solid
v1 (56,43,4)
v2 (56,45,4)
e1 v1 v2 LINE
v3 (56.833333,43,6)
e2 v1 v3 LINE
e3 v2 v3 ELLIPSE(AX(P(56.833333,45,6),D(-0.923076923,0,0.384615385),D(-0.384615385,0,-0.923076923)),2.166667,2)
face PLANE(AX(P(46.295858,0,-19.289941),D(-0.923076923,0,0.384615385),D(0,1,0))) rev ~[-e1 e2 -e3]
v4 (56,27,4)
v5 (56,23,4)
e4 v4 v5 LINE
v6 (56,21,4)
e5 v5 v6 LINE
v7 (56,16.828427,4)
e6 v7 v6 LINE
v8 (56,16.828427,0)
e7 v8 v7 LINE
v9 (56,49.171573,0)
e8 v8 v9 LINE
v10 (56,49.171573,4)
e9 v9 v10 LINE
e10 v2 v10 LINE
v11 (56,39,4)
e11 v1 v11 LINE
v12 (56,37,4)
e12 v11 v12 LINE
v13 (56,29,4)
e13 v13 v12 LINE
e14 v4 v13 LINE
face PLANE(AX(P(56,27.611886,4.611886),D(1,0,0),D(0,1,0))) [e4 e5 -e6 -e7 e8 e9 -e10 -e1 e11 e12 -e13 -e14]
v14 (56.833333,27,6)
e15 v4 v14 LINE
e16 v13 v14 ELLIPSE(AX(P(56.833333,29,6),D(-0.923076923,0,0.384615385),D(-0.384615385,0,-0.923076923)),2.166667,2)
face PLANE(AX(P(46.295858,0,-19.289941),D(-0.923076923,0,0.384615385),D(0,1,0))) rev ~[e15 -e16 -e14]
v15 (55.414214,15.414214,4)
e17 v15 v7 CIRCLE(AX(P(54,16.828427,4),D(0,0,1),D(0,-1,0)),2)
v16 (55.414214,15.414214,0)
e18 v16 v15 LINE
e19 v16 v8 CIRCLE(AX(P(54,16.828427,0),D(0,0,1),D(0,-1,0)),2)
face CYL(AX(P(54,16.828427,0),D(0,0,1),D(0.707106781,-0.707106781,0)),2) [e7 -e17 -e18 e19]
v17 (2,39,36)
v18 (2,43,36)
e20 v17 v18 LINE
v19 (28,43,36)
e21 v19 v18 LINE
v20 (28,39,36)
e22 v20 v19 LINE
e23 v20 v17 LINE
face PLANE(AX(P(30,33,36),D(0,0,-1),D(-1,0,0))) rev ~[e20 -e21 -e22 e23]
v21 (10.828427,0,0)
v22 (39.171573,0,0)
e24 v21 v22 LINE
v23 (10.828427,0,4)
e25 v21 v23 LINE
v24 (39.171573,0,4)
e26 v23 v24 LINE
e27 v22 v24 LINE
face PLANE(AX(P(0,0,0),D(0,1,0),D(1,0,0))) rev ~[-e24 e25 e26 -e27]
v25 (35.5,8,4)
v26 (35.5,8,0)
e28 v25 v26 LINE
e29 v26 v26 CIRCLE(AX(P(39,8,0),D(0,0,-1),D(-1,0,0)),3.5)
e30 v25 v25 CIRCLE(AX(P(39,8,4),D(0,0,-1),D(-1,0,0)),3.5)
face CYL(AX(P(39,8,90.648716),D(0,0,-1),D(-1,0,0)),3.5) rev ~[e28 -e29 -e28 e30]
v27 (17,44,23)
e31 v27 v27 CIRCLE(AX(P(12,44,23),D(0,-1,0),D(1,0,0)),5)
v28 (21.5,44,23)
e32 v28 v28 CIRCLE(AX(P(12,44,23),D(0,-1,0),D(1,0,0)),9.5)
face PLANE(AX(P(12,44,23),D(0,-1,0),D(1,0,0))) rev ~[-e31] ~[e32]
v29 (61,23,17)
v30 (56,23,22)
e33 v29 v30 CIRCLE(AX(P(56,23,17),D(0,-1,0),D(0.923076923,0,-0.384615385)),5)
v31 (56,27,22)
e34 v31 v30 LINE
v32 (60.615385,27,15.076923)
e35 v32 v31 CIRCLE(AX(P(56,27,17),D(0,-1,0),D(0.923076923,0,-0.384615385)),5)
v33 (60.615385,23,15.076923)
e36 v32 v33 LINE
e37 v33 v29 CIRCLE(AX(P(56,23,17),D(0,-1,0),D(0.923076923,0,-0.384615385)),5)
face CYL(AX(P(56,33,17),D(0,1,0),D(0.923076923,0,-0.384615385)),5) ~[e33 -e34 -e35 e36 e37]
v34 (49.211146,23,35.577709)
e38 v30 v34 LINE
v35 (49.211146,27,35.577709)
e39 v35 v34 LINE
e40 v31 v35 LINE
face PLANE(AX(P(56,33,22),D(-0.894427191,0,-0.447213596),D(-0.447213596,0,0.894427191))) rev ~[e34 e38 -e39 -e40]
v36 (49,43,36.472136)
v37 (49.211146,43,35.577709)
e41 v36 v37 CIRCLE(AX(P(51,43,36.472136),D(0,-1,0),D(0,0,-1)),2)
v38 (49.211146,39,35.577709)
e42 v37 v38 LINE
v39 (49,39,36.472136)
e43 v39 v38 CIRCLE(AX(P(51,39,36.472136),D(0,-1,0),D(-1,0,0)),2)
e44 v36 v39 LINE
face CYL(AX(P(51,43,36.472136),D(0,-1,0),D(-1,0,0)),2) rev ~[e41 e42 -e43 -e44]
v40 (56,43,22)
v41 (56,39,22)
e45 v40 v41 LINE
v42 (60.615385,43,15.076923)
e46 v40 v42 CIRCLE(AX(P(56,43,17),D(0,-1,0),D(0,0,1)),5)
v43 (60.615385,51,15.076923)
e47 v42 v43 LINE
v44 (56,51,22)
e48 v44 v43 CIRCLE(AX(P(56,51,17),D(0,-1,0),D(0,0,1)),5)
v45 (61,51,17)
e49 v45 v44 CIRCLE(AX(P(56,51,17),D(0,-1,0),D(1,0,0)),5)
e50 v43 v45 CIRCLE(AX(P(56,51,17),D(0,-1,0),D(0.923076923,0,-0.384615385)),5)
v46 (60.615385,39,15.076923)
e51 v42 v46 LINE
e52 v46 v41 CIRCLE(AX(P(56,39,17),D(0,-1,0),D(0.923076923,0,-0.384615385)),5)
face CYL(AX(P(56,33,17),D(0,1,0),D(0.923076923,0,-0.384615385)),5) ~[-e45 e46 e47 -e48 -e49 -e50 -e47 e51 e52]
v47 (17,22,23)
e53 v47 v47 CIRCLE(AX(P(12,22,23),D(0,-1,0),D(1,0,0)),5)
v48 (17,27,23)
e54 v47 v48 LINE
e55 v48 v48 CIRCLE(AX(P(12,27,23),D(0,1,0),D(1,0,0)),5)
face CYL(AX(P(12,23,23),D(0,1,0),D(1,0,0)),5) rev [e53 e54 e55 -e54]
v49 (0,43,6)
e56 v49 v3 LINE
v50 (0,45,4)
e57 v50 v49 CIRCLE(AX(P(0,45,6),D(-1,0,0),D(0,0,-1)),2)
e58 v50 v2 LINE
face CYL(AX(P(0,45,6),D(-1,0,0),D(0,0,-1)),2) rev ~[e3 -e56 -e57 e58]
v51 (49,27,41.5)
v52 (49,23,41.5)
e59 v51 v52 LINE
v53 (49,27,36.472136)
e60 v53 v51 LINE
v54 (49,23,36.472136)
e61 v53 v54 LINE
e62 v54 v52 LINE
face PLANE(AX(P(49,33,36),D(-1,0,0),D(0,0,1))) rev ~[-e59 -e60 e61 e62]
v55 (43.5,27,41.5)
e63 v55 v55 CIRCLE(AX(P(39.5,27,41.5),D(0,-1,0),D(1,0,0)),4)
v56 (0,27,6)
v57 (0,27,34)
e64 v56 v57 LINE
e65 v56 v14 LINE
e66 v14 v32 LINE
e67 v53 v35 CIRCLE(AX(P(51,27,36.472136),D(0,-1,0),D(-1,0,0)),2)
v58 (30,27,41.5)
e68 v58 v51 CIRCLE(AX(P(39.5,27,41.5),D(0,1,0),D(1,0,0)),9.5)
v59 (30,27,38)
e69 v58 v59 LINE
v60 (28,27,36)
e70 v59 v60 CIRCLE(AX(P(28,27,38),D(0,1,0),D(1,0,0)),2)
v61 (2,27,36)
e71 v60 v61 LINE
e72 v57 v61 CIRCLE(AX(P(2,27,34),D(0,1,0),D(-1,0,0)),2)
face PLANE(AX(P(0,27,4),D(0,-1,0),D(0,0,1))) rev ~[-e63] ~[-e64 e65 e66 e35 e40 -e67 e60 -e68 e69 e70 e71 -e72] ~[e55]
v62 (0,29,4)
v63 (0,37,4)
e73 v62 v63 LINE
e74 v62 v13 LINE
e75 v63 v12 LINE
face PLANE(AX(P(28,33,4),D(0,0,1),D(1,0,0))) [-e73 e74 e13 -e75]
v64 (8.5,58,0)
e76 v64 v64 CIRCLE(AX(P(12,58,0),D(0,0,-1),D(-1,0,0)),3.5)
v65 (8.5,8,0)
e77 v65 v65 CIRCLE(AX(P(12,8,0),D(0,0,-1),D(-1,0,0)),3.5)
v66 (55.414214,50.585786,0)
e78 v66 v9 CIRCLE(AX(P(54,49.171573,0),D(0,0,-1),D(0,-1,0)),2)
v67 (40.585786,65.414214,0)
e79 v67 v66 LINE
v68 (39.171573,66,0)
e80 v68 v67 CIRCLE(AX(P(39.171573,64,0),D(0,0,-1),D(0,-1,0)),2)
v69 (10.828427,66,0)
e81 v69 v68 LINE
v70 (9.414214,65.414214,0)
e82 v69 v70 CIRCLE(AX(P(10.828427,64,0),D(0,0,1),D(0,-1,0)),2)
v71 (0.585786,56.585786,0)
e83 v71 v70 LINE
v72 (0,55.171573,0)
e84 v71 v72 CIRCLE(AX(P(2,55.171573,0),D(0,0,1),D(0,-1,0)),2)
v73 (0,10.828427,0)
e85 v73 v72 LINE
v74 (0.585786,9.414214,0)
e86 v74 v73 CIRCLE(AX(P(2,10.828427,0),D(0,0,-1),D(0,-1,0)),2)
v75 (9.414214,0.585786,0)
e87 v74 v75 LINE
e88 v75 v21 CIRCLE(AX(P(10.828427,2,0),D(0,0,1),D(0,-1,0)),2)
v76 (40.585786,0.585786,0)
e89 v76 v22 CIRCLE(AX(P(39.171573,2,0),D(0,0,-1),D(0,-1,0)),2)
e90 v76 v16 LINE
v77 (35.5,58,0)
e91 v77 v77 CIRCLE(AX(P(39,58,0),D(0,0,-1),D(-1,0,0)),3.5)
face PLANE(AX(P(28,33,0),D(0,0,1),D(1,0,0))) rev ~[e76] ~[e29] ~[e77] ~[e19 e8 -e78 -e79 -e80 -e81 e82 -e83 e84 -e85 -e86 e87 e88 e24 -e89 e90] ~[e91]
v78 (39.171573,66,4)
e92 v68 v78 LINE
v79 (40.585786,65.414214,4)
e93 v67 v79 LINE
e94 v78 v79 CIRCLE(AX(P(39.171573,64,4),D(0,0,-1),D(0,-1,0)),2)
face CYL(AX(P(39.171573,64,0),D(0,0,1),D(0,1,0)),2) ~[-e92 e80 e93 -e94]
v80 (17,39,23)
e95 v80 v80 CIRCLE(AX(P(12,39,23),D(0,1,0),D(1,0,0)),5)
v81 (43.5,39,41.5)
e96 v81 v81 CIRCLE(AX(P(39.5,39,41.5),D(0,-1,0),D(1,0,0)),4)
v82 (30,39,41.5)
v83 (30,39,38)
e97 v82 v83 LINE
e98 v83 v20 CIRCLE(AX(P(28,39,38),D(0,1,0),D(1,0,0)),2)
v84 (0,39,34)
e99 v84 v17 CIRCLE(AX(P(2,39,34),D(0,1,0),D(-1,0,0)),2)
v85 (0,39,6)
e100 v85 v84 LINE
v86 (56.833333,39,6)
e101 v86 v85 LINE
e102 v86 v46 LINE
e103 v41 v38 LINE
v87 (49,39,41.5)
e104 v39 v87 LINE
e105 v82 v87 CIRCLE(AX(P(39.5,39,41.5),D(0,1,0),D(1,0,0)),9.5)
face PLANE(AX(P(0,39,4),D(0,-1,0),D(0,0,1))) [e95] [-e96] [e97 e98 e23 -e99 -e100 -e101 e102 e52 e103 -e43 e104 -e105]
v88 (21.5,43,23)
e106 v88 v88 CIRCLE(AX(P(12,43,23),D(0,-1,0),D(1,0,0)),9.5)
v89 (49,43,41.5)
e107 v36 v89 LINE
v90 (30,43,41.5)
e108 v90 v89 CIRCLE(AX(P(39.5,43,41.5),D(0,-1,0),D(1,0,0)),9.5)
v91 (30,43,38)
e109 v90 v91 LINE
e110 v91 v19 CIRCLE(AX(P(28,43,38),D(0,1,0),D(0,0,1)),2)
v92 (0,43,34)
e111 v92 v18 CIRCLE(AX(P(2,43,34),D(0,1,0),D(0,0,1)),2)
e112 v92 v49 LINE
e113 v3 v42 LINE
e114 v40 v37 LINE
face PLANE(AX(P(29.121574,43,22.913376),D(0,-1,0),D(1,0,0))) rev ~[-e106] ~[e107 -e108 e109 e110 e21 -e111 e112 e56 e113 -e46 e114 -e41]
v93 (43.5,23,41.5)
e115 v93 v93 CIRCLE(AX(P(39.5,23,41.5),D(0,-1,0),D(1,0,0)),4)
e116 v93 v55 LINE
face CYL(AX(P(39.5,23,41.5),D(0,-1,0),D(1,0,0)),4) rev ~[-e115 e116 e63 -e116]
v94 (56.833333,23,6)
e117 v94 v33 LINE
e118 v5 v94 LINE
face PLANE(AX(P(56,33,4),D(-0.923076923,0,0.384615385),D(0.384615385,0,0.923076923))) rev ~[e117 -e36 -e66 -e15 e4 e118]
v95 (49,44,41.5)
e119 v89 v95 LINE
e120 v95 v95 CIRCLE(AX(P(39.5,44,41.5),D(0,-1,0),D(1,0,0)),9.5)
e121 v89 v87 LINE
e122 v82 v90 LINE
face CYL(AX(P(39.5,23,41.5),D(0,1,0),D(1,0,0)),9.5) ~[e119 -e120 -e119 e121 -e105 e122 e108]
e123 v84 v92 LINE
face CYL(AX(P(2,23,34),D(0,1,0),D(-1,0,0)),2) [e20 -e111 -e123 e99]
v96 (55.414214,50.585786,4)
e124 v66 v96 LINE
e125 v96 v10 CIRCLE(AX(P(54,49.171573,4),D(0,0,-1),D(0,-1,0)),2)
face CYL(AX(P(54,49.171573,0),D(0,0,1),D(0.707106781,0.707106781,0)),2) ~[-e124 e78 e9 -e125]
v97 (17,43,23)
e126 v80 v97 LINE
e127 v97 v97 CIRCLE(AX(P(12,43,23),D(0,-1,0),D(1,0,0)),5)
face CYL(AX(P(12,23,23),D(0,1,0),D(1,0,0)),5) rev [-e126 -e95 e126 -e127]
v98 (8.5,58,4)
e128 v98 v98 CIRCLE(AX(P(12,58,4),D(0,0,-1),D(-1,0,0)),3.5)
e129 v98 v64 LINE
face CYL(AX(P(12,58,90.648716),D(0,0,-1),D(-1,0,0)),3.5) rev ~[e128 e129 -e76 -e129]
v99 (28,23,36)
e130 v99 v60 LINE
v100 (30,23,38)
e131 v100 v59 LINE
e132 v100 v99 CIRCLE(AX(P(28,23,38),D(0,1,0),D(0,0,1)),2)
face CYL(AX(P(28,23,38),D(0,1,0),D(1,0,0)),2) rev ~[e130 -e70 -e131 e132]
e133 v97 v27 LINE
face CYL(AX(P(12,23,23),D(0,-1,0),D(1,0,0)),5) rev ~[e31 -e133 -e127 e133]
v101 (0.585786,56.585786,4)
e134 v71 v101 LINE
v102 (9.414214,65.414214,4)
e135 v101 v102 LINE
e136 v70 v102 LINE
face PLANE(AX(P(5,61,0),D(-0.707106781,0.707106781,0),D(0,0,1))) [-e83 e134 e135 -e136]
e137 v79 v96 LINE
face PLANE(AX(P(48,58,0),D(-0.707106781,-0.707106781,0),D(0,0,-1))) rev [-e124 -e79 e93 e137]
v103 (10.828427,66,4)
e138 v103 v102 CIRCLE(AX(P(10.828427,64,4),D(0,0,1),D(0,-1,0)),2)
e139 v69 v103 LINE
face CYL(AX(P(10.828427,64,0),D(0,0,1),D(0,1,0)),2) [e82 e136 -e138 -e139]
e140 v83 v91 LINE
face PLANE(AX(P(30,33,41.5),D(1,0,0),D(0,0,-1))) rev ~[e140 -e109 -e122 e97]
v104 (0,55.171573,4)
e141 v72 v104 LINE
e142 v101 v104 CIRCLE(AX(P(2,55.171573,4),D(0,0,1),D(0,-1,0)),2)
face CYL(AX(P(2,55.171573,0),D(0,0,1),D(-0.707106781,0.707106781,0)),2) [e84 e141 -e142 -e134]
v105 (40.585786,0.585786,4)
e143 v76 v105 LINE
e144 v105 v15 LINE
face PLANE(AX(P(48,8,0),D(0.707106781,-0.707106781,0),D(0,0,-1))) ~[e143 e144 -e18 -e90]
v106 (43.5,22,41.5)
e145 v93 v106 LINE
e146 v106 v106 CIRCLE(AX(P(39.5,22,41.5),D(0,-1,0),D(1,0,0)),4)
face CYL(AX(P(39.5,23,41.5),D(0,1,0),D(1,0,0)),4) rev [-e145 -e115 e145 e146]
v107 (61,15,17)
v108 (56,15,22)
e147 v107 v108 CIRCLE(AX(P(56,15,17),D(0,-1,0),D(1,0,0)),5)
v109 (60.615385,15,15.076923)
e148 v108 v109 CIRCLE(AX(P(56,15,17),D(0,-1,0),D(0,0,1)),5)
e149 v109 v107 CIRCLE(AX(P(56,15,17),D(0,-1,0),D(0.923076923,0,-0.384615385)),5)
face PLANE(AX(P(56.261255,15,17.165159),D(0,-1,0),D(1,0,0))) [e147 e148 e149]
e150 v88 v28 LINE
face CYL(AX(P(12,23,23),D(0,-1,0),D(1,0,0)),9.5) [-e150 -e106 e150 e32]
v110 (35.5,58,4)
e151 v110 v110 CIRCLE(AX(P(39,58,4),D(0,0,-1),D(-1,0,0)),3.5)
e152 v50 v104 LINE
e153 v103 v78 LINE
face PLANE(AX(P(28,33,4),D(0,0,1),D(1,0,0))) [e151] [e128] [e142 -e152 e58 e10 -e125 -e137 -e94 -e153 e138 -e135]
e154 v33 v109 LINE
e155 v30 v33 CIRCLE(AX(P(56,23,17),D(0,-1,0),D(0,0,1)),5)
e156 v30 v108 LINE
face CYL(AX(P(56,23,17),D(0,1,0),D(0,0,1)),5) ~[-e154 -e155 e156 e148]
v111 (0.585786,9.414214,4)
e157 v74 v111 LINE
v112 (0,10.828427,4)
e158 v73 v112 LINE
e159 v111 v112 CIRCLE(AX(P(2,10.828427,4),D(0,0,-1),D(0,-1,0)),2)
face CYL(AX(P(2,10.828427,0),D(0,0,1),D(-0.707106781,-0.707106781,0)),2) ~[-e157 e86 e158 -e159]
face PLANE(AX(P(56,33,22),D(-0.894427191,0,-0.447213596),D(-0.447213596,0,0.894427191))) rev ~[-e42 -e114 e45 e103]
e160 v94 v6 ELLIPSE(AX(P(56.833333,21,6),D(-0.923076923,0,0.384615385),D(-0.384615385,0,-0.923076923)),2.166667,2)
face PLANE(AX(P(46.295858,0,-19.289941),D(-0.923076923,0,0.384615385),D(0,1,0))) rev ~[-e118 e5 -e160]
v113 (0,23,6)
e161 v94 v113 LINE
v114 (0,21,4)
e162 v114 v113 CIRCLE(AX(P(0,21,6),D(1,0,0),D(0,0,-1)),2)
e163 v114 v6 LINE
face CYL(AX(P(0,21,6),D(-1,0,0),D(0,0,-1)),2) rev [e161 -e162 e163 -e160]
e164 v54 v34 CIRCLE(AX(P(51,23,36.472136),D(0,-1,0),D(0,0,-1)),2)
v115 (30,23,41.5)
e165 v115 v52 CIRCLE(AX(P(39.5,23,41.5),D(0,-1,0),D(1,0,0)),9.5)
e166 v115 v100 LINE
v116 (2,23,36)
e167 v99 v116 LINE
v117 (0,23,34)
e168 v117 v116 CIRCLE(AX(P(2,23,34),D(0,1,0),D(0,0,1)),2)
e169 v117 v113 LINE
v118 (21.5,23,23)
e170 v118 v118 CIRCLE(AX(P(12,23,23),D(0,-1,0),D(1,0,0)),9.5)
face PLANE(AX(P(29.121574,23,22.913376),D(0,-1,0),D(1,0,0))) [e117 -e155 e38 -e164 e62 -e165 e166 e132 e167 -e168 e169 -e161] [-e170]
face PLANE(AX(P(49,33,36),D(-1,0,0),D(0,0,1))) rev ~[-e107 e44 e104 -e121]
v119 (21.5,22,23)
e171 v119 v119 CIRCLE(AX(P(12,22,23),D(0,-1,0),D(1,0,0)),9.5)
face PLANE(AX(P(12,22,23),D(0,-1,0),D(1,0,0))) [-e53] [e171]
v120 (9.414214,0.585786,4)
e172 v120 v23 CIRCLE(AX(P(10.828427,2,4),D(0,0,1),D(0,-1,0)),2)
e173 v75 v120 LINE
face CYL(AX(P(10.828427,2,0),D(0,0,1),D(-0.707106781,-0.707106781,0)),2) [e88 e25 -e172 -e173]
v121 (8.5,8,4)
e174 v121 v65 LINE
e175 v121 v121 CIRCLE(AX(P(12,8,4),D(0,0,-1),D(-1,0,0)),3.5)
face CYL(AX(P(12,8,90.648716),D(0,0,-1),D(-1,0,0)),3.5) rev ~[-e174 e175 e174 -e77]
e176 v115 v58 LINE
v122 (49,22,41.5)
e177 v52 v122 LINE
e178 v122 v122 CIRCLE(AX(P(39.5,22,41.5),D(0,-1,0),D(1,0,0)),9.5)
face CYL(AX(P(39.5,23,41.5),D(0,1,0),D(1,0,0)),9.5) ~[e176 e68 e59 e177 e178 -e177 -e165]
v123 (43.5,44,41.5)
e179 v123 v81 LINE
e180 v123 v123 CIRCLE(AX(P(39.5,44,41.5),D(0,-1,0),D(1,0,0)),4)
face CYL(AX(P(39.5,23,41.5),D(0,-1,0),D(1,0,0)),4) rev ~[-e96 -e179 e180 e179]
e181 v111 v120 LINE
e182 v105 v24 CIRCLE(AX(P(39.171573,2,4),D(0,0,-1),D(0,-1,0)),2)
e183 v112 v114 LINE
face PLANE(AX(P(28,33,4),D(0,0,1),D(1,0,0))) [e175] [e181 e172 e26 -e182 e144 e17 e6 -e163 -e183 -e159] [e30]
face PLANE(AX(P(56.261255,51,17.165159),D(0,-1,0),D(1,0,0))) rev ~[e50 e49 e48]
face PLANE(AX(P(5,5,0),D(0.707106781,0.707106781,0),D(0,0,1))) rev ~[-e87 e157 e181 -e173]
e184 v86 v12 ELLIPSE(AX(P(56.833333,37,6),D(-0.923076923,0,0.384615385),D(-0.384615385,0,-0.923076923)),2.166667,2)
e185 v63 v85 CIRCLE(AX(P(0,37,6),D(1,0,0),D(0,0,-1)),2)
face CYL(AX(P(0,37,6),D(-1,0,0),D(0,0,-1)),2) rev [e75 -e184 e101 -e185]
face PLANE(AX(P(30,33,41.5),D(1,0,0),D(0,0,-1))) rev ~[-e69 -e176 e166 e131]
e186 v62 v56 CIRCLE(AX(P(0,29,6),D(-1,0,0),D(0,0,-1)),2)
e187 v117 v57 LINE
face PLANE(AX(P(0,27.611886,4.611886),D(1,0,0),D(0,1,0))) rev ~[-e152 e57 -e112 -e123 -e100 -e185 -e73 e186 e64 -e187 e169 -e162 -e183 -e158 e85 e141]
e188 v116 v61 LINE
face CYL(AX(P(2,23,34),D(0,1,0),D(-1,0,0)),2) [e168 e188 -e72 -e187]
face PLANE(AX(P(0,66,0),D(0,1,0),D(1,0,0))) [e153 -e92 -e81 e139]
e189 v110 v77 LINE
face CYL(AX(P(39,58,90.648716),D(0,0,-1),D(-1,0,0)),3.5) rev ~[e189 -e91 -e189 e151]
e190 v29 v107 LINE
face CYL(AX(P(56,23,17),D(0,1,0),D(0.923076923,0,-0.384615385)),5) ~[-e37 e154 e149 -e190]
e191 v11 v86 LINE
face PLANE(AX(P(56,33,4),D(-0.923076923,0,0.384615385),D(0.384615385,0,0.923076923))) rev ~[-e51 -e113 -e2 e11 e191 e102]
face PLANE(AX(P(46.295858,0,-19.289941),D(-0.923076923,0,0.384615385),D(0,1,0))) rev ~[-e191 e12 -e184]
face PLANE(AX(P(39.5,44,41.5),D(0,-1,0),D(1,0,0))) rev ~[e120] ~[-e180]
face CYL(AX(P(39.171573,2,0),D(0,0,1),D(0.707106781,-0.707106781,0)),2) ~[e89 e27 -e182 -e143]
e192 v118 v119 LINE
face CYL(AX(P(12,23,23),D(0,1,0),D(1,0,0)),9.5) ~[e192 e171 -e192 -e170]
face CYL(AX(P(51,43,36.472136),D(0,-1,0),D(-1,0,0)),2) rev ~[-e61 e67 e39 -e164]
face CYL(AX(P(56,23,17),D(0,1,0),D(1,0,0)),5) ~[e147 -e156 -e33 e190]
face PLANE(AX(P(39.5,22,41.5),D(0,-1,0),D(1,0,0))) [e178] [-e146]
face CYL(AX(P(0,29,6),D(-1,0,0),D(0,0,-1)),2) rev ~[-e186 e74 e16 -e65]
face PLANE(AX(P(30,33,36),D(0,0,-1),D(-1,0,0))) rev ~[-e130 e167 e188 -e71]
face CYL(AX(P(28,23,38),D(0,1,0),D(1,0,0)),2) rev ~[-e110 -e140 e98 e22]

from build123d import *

# Parameters (mm, degrees)
F0_W           = 56
F0_H           = 66
F1_DEPTH       = 4
F3_D           = 7
F4_SIZE2       = 10
F4_SIZE        = 10
F5_SIZE2       = 16
F5_SIZE        = 16
F8_DEPTH       = 10
F8_DEPTH_BACK  = 10
F9_R           = 2
F11_R          = 5
F11_R_2        = 4
F12_DEPTH      = 20
F11_R_3        = 9.5
F13_DEPTH      = 1
F13_DEPTH_BACK = 21
F15_DEPTH      = 8
F15_DEPTH_BACK = 28
F10_W          = 12
F10_H          = 50
F16_DEPTH      = 61.001
F18_T4_DEPTH   = 56
F18_T9_DEPTH   = 61
F18_T15_DEPTH  = 56
F18_T20_DEPTH  = 61
F18_T26_DEPTH  = 56
F18_T31_DEPTH  = 61
F18_T37_DEPTH  = 56
F18_T42_DEPTH  = 61
F19_R          = 2


# Not quite as in the source:
# - a fillet or chamfer that OpenCascade refuses, or shapes differently, is made with other operations: its cross-section is extruded or revolved along the edge and cut away or added


with BuildPart() as f1:
    # F0 (on Top) → F1 (new body)
    with BuildSketch(Plane.XY):
        with Locations((28, 33)):
            Rectangle(F0_W, F0_H)
    extrude(amount=F1_DEPTH)

    # F3 (through all)
    with Locations(Plane.XY.offset(4)):
        with Locations((12, 58), (39, 58), (39, 8), (12, 8)):
            Hole(F3_D / 2)

    # F4
    f4_edges = [f1.edges().sort_by_distance(p)[0] for p in [
        (0, 66, 2),
        (0, 0, 2),
    ]]
    chamfer(f4_edges, length=F4_SIZE, length2=F4_SIZE2)

    # F5
    f5_edges = [f1.edges().sort_by_distance(p)[0] for p in [
        (56, 66, 2),
        (56, 0, 2),
    ]]
    chamfer(f5_edges, length=F5_SIZE, length2=F5_SIZE2)


with BuildPart() as f8:
    # F7 (on mid) → F8 (new body, two sides)
    with BuildSketch(Plane.XZ.offset(-33)) as f8_sk:
        with BuildLine():
            Line((0, 36), (0, 4))
            Line((0, 4), (56, 4))
            Line((56, 4), (60.6153846154, 15.0769230769))
            ThreePointArc((60.6153846154, 15.0769230769), (60.1602514717, 19.7735009811), (56, 22))
            Line((56, 22), (49, 36))
            Line((49, 36), (49, 41.5))
            ThreePointArc((49, 41.5), (39.5, 51), (30, 41.5))
            Line((30, 41.5), (30, 36))
            Line((30, 36), (0, 36))
        make_face()
    extrude(amount=-F8_DEPTH)
    extrude(f8_sk.sketch, amount=F8_DEPTH_BACK)

    # F9
    f9_edges = [f8.edges().sort_by_distance(p)[0] for p in [
        (30, 33, 36),
        (49, 33, 36),
        (0, 33, 36),
    ]]
    fillet(f9_edges, radius=F9_R)

    # F11 (on face) → F12 (cut, through all)
    with BuildSketch(Plane.XZ.offset(-23)):
        with Locations((12, 23)):
            Circle(F11_R)
        with Locations((39.5, 41.5)):
            Circle(F11_R_2)
    extrude(amount=-F12_DEPTH, mode=Mode.SUBTRACT)

    # F11 (on face) → F13 (join, two sides)
    with BuildSketch(Plane.XZ.offset(-23)) as f13_sk:
        with Locations((12, 23)):
            Circle(F11_R_3)
        with Locations((12, 23)):
            Circle(F11_R, mode=Mode.SUBTRACT)
        with BuildLine():
            ThreePointArc((30, 41.5), (39.5, 32), (49, 41.5))
            ThreePointArc((49, 41.5), (39.5, 51), (30, 41.5))
        make_face()
        with Locations((39.5, 41.5)):
            Circle(F11_R_2, mode=Mode.SUBTRACT)
    extrude(amount=F13_DEPTH)
    extrude(f13_sk.sketch, amount=-F13_DEPTH_BACK)

    # F14 (on face) → F15 (join, two sides)
    with BuildSketch(Plane.XZ.offset(-23)) as f15_sk:
        with BuildLine():
            ThreePointArc((60.6153846154, 15.0769230769), (60.9029033785, 16.0194193243), (61, 17))
            ThreePointArc((61, 17), (59.5355339059, 20.5355339059), (56, 22))
            ThreePointArc((56, 22), (51.8397485283, 14.2264990189), (60.6153846154, 15.0769230769))
        make_face()
    extrude(amount=F15_DEPTH)
    extrude(f15_sk.sketch, amount=-F15_DEPTH_BACK)

    # F10 (on face) → F16 (cut, through all)
    with BuildSketch(Plane(origin=(0, 0, 0), x_dir=(0, -1, 0), z_dir=(-1, 0, 0))):
        with Locations((-33, 29)):
            Rectangle(F10_W, F10_H)
    extrude(amount=-F16_DEPTH, mode=Mode.SUBTRACT)


with BuildPart() as f1_1:
    add(f1.part)

    # F17: union F8
    add(f8.part)

    # F18: fillet of radius 2 on 4 edges, made by hand


with BuildPart() as f18_tool2:
    # F18_s3 → F18_t4 (new body)
    with BuildSketch(Plane.YZ):
        with BuildLine():
            ThreePointArc((21, 4), (22.4142135624, 4.5857864376), (23, 6))
            Line((23, 6), (23, 4))
            Line((23, 4), (21, 4))
        make_face()
    extrude(amount=F18_T4_DEPTH)

    split(bisect_by=Plane(origin=(46.2958579882, 0, -19.2899408284), x_dir=(0, 1, 0), z_dir=(-0.9230769231, 0, 0.3846153846)), keep=Keep.TOP)


with BuildPart() as f1_2:
    add(f1_1.part)

    # F18_t1: union F18_tool2
    add(f18_tool2.part)


with BuildPart() as f18_tool7:
    # F18_s8 → F18_t9 (new body)
    with BuildSketch(Plane.YZ):
        with BuildLine():
            ThreePointArc((21, 4), (22.4142135624, 4.5857864376), (23, 6))
            Line((23, 6), (23, 4))
            Line((23, 4), (21, 4))
        make_face()
    extrude(amount=F18_T9_DEPTH)

    split(bisect_by=Plane.YZ.offset(56), keep=Keep.TOP)

    split(bisect_by=Plane(origin=(46.2958579882, 0, -19.2899408284), x_dir=(0, 1, 0), z_dir=(-0.9230769231, 0, 0.3846153846)), keep=Keep.TOP)


with BuildPart() as f1_3:
    add(f1_2.part)

    # F18_t6: union F18_tool7
    add(f18_tool7.part)


with BuildPart() as f18_tool13:
    # F18_s14 → F18_t15 (new body)
    with BuildSketch(Plane.YZ):
        with BuildLine():
            ThreePointArc((37, 4), (38.4142135624, 4.5857864376), (39, 6))
            Line((39, 6), (39, 4))
            Line((39, 4), (37, 4))
        make_face()
    extrude(amount=F18_T15_DEPTH)

    split(bisect_by=Plane(origin=(46.2958579882, 0, -19.2899408284), x_dir=(0, 1, 0), z_dir=(-0.9230769231, 0, 0.3846153846)), keep=Keep.TOP)


with BuildPart() as f1_4:
    add(f1_3.part)

    # F18_t12: union F18_tool13
    add(f18_tool13.part)


with BuildPart() as f18_tool18:
    # F18_s19 → F18_t20 (new body)
    with BuildSketch(Plane.YZ):
        with BuildLine():
            ThreePointArc((37, 4), (38.4142135624, 4.5857864376), (39, 6))
            Line((39, 6), (39, 4))
            Line((39, 4), (37, 4))
        make_face()
    extrude(amount=F18_T20_DEPTH)

    split(bisect_by=Plane.YZ.offset(56), keep=Keep.TOP)

    split(bisect_by=Plane(origin=(46.2958579882, 0, -19.2899408284), x_dir=(0, 1, 0), z_dir=(-0.9230769231, 0, 0.3846153846)), keep=Keep.TOP)


with BuildPart() as f1_5:
    add(f1_4.part)

    # F18_t17: union F18_tool18
    add(f18_tool18.part)


with BuildPart() as f18_tool24:
    # F18_s25 → F18_t26 (new body)
    with BuildSketch(Plane.YZ):
        with BuildLine():
            ThreePointArc((45, 4), (43.5857864376, 4.5857864376), (43, 6))
            Line((43, 6), (43, 4))
            Line((43, 4), (45, 4))
        make_face()
    extrude(amount=F18_T26_DEPTH)

    split(bisect_by=Plane(origin=(46.2958579882, 0, -19.2899408284), x_dir=(0, 1, 0), z_dir=(-0.9230769231, 0, 0.3846153846)), keep=Keep.TOP)


with BuildPart() as f1_6:
    add(f1_5.part)

    # F18_t23: union F18_tool24
    add(f18_tool24.part)


with BuildPart() as f18_tool29:
    # F18_s30 → F18_t31 (new body)
    with BuildSketch(Plane.YZ):
        with BuildLine():
            ThreePointArc((45, 4), (43.5857864376, 4.5857864376), (43, 6))
            Line((43, 6), (43, 4))
            Line((43, 4), (45, 4))
        make_face()
    extrude(amount=F18_T31_DEPTH)

    split(bisect_by=Plane.YZ.offset(56), keep=Keep.TOP)

    split(bisect_by=Plane(origin=(46.2958579882, 0, -19.2899408284), x_dir=(0, 1, 0), z_dir=(-0.9230769231, 0, 0.3846153846)), keep=Keep.TOP)


with BuildPart() as f1_7:
    add(f1_6.part)

    # F18_t28: union F18_tool29
    add(f18_tool29.part)


with BuildPart() as f18_tool35:
    # F18_s36 → F18_t37 (new body)
    with BuildSketch(Plane.YZ):
        with BuildLine():
            ThreePointArc((29, 4), (27.5857864376, 4.5857864376), (27, 6))
            Line((27, 6), (27, 4))
            Line((27, 4), (29, 4))
        make_face()
    extrude(amount=F18_T37_DEPTH)

    split(bisect_by=Plane(origin=(46.2958579882, 0, -19.2899408284), x_dir=(0, 1, 0), z_dir=(-0.9230769231, 0, 0.3846153846)), keep=Keep.TOP)


with BuildPart() as f1_8:
    add(f1_7.part)

    # F18_t34: union F18_tool35
    add(f18_tool35.part)


with BuildPart() as f18_tool40:
    # F18_s41 → F18_t42 (new body)
    with BuildSketch(Plane.YZ):
        with BuildLine():
            ThreePointArc((29, 4), (27.5857864376, 4.5857864376), (27, 6))
            Line((27, 6), (27, 4))
            Line((27, 4), (29, 4))
        make_face()
    extrude(amount=F18_T42_DEPTH)

    split(bisect_by=Plane.YZ.offset(56), keep=Keep.TOP)

    split(bisect_by=Plane(origin=(46.2958579882, 0, -19.2899408284), x_dir=(0, 1, 0), z_dir=(-0.9230769231, 0, 0.3846153846)), keep=Keep.TOP)


with BuildPart() as f1_9:
    add(f1_8.part)

    # F18_t39: union F18_tool40
    add(f18_tool40.part)

    # F19
    f19_edges = [f1_9.edges().sort_by_distance(p)[0] for p in [
        (40, 0, 2),
        (56, 16, 2),
        (10, 0, 2),
        (56, 50, 2),
        (40, 66, 2),
        (10, 66, 2),
        (0, 56, 2),
        (0, 10, 2),
    ]]
    fillet(f19_edges, radius=F19_R)


solid = f1_9.part
